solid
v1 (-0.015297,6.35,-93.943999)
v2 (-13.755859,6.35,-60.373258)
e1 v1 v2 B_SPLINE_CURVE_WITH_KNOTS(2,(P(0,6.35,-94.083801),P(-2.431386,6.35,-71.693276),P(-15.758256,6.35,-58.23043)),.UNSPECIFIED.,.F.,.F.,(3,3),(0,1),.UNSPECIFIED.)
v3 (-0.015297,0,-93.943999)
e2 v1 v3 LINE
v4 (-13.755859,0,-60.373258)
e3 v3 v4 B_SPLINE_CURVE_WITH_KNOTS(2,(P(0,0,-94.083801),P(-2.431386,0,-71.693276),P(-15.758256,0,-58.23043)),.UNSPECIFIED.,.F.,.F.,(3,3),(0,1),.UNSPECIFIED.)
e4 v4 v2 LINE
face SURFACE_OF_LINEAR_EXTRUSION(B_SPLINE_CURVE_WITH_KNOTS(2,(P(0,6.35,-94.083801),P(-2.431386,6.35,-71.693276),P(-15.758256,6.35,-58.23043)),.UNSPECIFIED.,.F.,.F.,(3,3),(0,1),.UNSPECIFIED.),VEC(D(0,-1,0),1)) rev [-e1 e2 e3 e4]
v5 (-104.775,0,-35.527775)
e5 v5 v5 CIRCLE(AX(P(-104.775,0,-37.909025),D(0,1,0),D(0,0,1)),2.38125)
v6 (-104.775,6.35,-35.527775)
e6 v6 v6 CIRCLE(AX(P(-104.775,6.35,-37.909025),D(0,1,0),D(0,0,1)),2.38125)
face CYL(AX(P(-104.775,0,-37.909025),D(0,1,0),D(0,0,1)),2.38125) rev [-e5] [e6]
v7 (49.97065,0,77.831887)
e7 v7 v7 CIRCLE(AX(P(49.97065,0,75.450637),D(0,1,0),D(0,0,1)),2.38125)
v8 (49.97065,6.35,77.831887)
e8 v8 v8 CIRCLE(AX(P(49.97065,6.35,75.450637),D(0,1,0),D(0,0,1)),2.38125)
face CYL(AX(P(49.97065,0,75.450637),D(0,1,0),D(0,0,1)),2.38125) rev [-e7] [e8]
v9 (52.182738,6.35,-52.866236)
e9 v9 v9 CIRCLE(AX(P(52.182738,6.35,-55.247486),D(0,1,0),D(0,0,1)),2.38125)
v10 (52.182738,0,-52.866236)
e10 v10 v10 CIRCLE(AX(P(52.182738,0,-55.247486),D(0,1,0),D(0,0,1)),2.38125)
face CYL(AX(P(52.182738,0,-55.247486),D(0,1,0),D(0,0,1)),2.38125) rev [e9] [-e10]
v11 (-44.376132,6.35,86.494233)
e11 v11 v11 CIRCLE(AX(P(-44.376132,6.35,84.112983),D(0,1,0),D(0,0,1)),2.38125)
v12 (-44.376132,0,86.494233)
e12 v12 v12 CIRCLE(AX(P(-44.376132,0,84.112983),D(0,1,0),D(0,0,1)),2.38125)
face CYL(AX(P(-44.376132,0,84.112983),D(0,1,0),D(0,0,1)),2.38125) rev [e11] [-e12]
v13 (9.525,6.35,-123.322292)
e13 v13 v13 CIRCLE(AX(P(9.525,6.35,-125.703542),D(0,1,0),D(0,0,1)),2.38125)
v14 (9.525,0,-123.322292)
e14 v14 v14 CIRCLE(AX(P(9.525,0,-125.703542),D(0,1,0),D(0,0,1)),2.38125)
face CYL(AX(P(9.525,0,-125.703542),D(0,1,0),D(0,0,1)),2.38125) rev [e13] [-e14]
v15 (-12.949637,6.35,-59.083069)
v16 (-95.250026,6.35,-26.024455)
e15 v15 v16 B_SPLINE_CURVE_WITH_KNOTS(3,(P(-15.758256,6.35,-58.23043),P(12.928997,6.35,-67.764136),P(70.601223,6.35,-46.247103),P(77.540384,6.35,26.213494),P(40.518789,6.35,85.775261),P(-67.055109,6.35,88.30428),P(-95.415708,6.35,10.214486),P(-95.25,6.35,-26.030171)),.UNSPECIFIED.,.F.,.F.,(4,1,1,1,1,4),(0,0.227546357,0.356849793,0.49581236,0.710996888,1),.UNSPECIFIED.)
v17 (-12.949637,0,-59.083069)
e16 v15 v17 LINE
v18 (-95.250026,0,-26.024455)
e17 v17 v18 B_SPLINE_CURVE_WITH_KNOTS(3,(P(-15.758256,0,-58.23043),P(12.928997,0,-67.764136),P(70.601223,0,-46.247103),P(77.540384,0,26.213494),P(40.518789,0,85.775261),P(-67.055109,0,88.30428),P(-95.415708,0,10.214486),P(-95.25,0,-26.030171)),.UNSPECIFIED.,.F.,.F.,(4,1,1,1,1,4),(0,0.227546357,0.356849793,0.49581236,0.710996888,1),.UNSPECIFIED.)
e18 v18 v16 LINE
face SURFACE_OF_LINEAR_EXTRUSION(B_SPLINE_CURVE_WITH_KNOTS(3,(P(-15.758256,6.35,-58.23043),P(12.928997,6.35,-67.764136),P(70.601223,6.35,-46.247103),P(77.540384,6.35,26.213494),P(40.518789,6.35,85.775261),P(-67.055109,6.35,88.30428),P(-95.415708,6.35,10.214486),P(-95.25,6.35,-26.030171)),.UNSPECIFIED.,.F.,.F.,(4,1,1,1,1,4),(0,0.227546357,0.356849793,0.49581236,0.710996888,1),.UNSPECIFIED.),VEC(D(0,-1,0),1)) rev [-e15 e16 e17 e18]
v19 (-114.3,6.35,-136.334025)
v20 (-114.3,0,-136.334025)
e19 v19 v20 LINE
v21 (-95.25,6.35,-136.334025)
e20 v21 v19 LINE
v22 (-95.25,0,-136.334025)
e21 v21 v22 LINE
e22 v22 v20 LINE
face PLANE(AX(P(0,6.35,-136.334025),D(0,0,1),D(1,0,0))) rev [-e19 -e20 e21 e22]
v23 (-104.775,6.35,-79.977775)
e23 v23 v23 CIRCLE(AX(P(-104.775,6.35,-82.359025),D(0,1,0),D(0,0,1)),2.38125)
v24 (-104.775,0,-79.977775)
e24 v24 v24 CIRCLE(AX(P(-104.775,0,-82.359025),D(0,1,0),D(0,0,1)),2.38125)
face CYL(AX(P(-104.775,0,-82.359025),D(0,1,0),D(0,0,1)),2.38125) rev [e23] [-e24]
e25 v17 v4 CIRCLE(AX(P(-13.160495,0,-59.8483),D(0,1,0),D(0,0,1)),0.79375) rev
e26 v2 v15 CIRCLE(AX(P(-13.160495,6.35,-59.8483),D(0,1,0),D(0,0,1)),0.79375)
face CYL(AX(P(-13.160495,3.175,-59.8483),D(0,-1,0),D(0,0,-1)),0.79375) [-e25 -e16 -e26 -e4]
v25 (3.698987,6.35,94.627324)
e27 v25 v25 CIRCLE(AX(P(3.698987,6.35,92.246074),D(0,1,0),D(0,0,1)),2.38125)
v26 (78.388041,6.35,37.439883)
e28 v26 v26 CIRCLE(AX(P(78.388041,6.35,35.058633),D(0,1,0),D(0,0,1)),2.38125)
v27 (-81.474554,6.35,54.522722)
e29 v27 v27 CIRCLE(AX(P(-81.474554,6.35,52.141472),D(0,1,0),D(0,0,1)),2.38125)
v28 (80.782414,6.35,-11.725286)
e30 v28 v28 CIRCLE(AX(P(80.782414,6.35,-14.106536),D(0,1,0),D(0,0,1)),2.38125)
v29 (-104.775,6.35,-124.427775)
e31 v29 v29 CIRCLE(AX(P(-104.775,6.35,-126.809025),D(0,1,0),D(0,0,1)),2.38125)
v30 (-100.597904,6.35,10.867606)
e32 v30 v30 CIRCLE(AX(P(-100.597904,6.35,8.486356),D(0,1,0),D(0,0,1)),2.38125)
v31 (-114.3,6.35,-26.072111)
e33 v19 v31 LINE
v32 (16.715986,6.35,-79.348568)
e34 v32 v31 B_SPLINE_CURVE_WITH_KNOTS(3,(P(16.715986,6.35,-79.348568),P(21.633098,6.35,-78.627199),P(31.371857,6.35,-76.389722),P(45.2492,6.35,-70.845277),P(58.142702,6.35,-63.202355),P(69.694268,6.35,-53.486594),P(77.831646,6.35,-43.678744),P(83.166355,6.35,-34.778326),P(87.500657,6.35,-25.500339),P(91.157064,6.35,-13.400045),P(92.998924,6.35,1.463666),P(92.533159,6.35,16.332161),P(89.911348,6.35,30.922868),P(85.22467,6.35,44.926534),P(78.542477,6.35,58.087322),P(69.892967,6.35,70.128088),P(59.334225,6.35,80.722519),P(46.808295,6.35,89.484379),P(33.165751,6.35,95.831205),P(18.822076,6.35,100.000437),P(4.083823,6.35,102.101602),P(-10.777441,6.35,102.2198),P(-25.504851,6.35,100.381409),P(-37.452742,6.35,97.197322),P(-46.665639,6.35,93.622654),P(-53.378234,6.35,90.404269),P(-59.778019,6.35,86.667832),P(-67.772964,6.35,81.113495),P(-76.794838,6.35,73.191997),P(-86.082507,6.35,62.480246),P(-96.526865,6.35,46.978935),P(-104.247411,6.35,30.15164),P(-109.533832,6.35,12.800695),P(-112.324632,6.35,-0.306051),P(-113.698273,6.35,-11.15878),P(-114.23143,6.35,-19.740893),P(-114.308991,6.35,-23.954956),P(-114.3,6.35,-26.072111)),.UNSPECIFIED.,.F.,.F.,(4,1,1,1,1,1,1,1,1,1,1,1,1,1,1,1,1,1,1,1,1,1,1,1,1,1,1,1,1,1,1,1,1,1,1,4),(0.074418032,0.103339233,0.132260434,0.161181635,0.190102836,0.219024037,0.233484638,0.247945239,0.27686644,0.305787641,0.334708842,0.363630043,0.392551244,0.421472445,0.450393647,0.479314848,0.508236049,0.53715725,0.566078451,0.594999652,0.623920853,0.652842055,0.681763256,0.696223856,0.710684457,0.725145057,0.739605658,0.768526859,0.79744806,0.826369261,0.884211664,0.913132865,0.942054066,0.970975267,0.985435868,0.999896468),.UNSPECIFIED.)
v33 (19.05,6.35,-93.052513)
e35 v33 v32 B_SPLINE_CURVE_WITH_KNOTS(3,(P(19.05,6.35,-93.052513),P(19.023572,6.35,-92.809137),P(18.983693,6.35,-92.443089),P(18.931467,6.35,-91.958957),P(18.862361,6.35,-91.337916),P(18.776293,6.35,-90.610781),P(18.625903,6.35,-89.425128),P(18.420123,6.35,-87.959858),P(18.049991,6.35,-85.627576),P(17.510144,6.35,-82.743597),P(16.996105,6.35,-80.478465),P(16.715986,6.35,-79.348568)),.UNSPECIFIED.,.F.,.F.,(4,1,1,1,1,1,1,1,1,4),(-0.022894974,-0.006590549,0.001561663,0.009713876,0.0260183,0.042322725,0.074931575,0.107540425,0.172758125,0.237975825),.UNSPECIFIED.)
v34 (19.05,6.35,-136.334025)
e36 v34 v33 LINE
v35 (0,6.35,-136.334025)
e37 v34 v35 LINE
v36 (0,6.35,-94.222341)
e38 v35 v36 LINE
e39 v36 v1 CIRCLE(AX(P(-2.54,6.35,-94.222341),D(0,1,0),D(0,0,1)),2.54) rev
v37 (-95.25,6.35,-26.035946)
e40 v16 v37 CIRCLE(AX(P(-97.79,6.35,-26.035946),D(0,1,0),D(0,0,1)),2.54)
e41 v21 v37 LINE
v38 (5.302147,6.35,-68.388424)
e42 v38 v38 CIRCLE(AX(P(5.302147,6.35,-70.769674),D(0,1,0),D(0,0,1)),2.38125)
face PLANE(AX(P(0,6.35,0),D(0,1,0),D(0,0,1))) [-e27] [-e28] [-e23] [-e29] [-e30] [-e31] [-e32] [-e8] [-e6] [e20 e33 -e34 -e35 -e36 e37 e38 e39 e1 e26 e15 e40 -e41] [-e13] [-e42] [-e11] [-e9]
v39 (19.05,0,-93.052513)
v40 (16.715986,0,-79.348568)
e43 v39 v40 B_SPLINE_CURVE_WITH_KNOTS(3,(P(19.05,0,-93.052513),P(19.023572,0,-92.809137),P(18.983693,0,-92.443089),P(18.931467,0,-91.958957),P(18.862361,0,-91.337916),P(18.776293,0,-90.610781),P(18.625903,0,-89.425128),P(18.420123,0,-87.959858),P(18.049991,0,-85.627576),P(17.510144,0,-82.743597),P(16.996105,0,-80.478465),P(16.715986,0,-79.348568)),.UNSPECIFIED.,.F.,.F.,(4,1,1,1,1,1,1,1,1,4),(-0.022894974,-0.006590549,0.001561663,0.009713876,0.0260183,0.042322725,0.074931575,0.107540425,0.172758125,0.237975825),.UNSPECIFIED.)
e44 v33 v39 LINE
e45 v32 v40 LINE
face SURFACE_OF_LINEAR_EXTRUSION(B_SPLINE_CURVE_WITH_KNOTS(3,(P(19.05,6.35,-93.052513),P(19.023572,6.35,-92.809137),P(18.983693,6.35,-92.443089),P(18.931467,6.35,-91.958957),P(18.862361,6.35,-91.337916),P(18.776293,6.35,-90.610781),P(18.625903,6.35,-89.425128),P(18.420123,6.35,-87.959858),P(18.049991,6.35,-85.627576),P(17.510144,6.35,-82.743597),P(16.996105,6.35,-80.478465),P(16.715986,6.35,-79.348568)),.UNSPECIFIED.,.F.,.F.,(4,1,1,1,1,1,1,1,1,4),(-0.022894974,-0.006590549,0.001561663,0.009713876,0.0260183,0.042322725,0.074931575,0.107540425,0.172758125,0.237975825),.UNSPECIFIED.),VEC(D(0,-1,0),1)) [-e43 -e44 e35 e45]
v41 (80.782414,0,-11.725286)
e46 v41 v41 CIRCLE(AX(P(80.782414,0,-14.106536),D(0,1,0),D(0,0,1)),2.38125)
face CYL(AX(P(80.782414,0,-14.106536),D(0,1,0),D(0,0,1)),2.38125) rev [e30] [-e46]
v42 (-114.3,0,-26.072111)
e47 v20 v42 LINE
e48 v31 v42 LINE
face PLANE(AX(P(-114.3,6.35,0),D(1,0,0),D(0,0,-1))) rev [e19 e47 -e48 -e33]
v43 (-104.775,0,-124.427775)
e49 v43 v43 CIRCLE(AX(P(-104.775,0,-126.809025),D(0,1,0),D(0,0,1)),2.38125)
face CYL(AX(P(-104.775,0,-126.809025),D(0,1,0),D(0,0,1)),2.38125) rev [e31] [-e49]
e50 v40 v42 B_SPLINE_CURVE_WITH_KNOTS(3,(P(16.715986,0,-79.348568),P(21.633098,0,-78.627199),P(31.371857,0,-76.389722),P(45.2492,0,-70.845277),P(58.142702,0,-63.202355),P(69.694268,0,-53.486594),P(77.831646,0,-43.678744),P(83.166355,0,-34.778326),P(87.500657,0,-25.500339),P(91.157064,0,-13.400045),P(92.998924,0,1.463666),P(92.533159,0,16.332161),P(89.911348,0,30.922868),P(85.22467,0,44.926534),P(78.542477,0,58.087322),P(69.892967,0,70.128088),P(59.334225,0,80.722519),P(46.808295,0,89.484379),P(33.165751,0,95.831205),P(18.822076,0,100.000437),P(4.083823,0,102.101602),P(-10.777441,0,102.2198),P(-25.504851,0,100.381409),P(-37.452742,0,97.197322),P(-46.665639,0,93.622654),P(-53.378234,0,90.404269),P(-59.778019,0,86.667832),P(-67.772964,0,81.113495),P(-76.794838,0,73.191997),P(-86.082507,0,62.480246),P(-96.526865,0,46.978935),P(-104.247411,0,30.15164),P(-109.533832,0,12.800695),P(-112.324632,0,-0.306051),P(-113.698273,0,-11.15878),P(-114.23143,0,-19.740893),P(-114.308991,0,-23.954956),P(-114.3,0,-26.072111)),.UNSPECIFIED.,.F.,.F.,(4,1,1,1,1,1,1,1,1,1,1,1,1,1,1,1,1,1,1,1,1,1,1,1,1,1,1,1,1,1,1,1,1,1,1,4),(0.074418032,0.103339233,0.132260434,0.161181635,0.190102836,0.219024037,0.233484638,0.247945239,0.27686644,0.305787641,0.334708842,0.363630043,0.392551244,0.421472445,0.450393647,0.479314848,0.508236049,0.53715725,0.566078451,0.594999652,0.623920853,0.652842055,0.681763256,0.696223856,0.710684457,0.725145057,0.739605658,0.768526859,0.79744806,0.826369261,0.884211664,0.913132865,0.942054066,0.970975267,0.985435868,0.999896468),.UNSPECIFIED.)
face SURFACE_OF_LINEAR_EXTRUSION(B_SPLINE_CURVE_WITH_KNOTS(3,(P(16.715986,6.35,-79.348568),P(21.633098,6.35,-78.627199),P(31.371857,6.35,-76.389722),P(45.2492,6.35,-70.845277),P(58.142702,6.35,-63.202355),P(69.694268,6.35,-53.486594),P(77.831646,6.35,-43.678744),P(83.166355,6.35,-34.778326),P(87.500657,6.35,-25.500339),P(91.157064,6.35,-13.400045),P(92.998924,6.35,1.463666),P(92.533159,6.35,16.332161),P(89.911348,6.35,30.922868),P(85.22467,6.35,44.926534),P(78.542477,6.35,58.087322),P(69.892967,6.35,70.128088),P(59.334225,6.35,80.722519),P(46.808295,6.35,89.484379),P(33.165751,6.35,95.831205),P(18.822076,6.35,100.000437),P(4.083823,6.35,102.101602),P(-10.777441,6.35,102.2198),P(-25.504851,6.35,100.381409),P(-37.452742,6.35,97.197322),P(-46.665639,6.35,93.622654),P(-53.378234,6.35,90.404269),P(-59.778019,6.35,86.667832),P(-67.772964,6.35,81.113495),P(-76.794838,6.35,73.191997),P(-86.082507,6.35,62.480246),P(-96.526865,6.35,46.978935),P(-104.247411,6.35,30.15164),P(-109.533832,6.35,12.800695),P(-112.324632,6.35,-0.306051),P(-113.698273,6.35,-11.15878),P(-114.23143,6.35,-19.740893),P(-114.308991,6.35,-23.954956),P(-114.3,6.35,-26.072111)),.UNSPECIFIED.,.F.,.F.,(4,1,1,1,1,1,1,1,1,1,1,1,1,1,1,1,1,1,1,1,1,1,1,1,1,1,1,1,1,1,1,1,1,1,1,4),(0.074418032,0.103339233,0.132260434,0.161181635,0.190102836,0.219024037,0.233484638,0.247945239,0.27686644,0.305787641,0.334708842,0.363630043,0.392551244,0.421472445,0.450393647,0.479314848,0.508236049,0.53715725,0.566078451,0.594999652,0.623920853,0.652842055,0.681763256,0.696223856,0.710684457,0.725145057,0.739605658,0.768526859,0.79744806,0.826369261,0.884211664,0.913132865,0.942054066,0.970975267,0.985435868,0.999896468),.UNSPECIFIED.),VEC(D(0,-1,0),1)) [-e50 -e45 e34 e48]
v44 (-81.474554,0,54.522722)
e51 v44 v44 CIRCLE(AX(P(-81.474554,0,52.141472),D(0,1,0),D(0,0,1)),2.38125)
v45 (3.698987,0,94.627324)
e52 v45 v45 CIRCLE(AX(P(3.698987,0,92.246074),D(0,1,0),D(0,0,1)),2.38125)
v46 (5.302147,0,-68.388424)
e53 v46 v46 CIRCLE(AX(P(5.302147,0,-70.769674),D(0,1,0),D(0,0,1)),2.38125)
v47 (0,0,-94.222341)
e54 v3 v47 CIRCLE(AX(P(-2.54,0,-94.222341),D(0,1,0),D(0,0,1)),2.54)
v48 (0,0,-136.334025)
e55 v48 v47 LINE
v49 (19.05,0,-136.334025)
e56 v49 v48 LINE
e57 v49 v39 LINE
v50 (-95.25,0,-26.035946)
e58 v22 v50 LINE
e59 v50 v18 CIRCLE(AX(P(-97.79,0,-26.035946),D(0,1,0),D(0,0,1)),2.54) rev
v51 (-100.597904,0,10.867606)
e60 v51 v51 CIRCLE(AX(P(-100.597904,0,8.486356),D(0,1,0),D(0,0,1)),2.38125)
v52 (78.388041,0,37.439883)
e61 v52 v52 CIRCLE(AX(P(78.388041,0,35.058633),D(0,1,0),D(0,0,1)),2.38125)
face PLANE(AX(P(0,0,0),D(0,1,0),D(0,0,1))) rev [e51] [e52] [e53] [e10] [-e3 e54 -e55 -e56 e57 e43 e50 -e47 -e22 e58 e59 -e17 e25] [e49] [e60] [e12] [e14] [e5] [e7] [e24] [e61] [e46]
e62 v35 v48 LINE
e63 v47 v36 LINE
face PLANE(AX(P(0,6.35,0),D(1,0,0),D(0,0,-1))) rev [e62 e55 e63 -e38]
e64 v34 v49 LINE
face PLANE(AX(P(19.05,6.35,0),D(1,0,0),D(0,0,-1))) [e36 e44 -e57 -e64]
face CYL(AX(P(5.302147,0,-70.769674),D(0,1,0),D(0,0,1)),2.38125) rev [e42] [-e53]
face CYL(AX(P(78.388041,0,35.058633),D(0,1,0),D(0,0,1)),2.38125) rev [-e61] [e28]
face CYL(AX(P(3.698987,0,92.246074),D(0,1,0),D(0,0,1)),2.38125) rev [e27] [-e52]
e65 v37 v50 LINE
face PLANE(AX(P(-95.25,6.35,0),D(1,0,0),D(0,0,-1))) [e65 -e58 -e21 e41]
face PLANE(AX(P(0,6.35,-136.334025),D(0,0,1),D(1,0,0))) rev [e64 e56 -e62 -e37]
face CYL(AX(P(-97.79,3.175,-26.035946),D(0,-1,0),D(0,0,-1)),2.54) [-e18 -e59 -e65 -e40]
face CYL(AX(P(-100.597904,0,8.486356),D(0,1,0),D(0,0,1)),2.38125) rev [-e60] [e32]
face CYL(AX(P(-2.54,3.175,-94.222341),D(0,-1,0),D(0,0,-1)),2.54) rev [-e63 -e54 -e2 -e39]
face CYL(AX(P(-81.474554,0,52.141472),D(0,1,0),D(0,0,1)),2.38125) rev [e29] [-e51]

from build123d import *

# Parameters (mm, degrees)
BOSS_EXTRUDE1_DEPTH   = 6.35
FILLET1_R             = 2.54
FILLET2_R             = 0.79375
SKETCH4_R             = 2.38125
CUT_EXTRUDE3_DEPTH    = 6.35
CRVPATTERN1_OUTLINE_R = 2.38125
CRVPATTERN1_DEPTH     = 6.35


# Read off the part's stored shape, not the designer's step: CrvPattern1
with BuildPart() as part:
    # Sketch1 → Boss-Extrude1 (new body)
    with BuildSketch(Plane(origin=(0, 0, 0), x_dir=(1, 0, 0), z_dir=(0, 1, 0))):
        with BuildLine():
            Line((0, 136.334024978), (0, 94.083801247))
            add(Edge.make_bspline(
                [(0, 94.083801247), (-2.431386336, 71.693275709), (-15.75825593, 58.230430146)],
                knots=[0, 0, 0, 1, 1, 1], degree=2))
            add(Edge.make_bspline(
                [(-15.75825593, 58.230430146), (12.928997408, 67.764135595), (70.60122301, 46.247103047), (77.540383798, -26.213493844), (40.518788725, -85.775261158), (-67.055108572, -88.304279922), (-95.415707681, -10.214485927), (-95.25, 26.030170649)],
                knots=[0, 0, 0, 0, 0.227546357, 0.356849793, 0.49581236, 0.710996888, 1, 1, 1, 1], degree=3))
            Line((-95.25, 26.030170649), (-95.25, 136.334024978))
            Line((-95.25, 136.334024978), (-114.3, 136.334024978))
            Line((-114.3, 136.334024978), (-114.3, 26.072111228))
            add(Edge.make_bspline(
                [(16.715986391, 79.348568009), (21.633097871, 78.62719896), (31.371857261, 76.389721894), (45.249200497, 70.845276961), (58.14270202, 63.202354702), (69.694268499, 53.486594004), (77.831645881, 43.678743898), (83.1663553, 34.778326042), (87.500656656, 25.500338712), (91.157064432, 13.400044888), (92.998924079, -1.463666218), (92.533158628, -16.332160856), (89.911348046, -30.922868008), (85.224669703, -44.926534482), (78.5424766, -58.087321563), (69.892966554, -70.128088223), (59.334225085, -80.722518946), (46.808294676, -89.48437896), (33.165750854, -95.831204537), (18.8220758, -100.00043745), (4.083822861, -102.101602424), (-10.777441223, -102.219799961), (-25.504851136, -100.381408636), (-37.452741503, -97.197322494), (-46.66563909, -93.622653994), (-53.378233983, -90.404269128), (-59.778019163, -86.667831837), (-67.772964247, -81.11349497), (-76.794838317, -73.191996697), (-86.082507199, -62.480245978), (-96.526865188, -46.978935087), (-104.24741081, -30.151640125), (-109.53383183, -12.800694626), (-112.324631517, 0.306051107), (-113.698273493, 11.158780223), (-114.231429958, 19.740893087), (-114.308990648, 23.9549561), (-114.3, 26.072111228)],
                knots=[0.074418032, 0.074418032, 0.074418032, 0.074418032, 0.103339233, 0.132260434, 0.161181635, 0.190102836, 0.219024037, 0.233484638, 0.247945239, 0.27686644, 0.305787641, 0.334708842, 0.363630043, 0.392551244, 0.421472445, 0.450393647, 0.479314848, 0.508236049, 0.53715725, 0.566078451, 0.594999652, 0.623920853, 0.652842055, 0.681763256, 0.696223856, 0.710684457, 0.725145057, 0.739605658, 0.768526859, 0.79744806, 0.826369261, 0.884211664, 0.913132865, 0.942054066, 0.970975267, 0.985435868, 0.999896468, 0.999896468, 0.999896468, 0.999896468], degree=3))
            add(Edge.make_bspline(
                [(19.05, 93.052513121), (19.023571763, 92.809136693), (18.983692868, 92.443089224), (18.931467162, 91.958957236), (18.862360798, 91.337915751), (18.776292871, 90.610780885), (18.625902721, 89.42512839), (18.420122868, 87.959858448), (18.049990563, 85.627575808), (17.510143571, 82.743597147), (16.996105499, 80.478464636), (16.715986391, 79.348568009)],
                knots=[-0.022894974, -0.022894974, -0.022894974, -0.022894974, -0.006590549, 0.001561663, 0.009713876, 0.0260183, 0.042322725, 0.074931575, 0.107540425, 0.172758125, 0.237975825, 0.237975825, 0.237975825, 0.237975825], degree=3))
            Line((19.05, 93.052513121), (19.05, 136.334024978))
            Line((19.05, 136.334024978), (0, 136.334024978))
        make_face()
    extrude(amount=BOSS_EXTRUDE1_DEPTH)

    # Fillet1
    fillet1_edges = [part.edges().sort_by_distance(p)[0] for p in [
        (0, 3.175, -94.083801247),
        (-95.25, 3.175, -26.030170649),
    ]]
    fillet(fillet1_edges, radius=FILLET1_R)

    # Fillet2
    fillet2_edges = [part.edges().sort_by_distance(p)[0] for p in [
        (-15.75825593, 3.175, -58.230430146),
    ]]
    fillet(fillet2_edges, radius=FILLET2_R)

    # Sketch4 → Cut-Extrude3 (cut)
    with BuildSketch(Plane(origin=(0, 6.35, 0), x_dir=(1, 0, 0), z_dir=(0, 1, 0))):
        with Locations(Location((-104.775, 126.809024978, 0), (0, 0, 270))):
            Circle(SKETCH4_R)
    extrude(amount=-CUT_EXTRUDE3_DEPTH, mode=Mode.SUBTRACT)

    # CrvPattern1 outline → CrvPattern1 (cut)
    with BuildSketch(Plane(origin=(0, 0, 0), x_dir=(1, 0, 0), z_dir=(0, 1, 0))):
        with Locations((-104.775, 82.359024978)):
            Circle(CRVPATTERN1_OUTLINE_R)
        with Locations((-104.775, 37.909024978)):
            Circle(CRVPATTERN1_OUTLINE_R)
        with Locations((-100.597903535, -8.486356178)):
            Circle(CRVPATTERN1_OUTLINE_R)
        with Locations((-81.474554, -52.141471765)):
            Circle(CRVPATTERN1_OUTLINE_R)
        with Locations((-44.376132313, -84.112983027)):
            Circle(CRVPATTERN1_OUTLINE_R)
        with Locations((3.698987105, -92.246074321)):
            Circle(CRVPATTERN1_OUTLINE_R)
        with Locations((49.97064989, -75.450636534)):
            Circle(CRVPATTERN1_OUTLINE_R)
        with Locations((78.388040736, -35.058632959)):
            Circle(CRVPATTERN1_OUTLINE_R)
        with Locations((80.782414242, 14.106535639)):
            Circle(CRVPATTERN1_OUTLINE_R)
        with Locations((52.182738061, 55.247486043)):
            Circle(CRVPATTERN1_OUTLINE_R)
        with Locations((5.302146984, 70.7696737)):
            Circle(CRVPATTERN1_OUTLINE_R)
        with Locations((9.525, 125.703541591)):
            Circle(CRVPATTERN1_OUTLINE_R)
    extrude(amount=CRVPATTERN1_DEPTH, mode=Mode.SUBTRACT)


solid = part.part
